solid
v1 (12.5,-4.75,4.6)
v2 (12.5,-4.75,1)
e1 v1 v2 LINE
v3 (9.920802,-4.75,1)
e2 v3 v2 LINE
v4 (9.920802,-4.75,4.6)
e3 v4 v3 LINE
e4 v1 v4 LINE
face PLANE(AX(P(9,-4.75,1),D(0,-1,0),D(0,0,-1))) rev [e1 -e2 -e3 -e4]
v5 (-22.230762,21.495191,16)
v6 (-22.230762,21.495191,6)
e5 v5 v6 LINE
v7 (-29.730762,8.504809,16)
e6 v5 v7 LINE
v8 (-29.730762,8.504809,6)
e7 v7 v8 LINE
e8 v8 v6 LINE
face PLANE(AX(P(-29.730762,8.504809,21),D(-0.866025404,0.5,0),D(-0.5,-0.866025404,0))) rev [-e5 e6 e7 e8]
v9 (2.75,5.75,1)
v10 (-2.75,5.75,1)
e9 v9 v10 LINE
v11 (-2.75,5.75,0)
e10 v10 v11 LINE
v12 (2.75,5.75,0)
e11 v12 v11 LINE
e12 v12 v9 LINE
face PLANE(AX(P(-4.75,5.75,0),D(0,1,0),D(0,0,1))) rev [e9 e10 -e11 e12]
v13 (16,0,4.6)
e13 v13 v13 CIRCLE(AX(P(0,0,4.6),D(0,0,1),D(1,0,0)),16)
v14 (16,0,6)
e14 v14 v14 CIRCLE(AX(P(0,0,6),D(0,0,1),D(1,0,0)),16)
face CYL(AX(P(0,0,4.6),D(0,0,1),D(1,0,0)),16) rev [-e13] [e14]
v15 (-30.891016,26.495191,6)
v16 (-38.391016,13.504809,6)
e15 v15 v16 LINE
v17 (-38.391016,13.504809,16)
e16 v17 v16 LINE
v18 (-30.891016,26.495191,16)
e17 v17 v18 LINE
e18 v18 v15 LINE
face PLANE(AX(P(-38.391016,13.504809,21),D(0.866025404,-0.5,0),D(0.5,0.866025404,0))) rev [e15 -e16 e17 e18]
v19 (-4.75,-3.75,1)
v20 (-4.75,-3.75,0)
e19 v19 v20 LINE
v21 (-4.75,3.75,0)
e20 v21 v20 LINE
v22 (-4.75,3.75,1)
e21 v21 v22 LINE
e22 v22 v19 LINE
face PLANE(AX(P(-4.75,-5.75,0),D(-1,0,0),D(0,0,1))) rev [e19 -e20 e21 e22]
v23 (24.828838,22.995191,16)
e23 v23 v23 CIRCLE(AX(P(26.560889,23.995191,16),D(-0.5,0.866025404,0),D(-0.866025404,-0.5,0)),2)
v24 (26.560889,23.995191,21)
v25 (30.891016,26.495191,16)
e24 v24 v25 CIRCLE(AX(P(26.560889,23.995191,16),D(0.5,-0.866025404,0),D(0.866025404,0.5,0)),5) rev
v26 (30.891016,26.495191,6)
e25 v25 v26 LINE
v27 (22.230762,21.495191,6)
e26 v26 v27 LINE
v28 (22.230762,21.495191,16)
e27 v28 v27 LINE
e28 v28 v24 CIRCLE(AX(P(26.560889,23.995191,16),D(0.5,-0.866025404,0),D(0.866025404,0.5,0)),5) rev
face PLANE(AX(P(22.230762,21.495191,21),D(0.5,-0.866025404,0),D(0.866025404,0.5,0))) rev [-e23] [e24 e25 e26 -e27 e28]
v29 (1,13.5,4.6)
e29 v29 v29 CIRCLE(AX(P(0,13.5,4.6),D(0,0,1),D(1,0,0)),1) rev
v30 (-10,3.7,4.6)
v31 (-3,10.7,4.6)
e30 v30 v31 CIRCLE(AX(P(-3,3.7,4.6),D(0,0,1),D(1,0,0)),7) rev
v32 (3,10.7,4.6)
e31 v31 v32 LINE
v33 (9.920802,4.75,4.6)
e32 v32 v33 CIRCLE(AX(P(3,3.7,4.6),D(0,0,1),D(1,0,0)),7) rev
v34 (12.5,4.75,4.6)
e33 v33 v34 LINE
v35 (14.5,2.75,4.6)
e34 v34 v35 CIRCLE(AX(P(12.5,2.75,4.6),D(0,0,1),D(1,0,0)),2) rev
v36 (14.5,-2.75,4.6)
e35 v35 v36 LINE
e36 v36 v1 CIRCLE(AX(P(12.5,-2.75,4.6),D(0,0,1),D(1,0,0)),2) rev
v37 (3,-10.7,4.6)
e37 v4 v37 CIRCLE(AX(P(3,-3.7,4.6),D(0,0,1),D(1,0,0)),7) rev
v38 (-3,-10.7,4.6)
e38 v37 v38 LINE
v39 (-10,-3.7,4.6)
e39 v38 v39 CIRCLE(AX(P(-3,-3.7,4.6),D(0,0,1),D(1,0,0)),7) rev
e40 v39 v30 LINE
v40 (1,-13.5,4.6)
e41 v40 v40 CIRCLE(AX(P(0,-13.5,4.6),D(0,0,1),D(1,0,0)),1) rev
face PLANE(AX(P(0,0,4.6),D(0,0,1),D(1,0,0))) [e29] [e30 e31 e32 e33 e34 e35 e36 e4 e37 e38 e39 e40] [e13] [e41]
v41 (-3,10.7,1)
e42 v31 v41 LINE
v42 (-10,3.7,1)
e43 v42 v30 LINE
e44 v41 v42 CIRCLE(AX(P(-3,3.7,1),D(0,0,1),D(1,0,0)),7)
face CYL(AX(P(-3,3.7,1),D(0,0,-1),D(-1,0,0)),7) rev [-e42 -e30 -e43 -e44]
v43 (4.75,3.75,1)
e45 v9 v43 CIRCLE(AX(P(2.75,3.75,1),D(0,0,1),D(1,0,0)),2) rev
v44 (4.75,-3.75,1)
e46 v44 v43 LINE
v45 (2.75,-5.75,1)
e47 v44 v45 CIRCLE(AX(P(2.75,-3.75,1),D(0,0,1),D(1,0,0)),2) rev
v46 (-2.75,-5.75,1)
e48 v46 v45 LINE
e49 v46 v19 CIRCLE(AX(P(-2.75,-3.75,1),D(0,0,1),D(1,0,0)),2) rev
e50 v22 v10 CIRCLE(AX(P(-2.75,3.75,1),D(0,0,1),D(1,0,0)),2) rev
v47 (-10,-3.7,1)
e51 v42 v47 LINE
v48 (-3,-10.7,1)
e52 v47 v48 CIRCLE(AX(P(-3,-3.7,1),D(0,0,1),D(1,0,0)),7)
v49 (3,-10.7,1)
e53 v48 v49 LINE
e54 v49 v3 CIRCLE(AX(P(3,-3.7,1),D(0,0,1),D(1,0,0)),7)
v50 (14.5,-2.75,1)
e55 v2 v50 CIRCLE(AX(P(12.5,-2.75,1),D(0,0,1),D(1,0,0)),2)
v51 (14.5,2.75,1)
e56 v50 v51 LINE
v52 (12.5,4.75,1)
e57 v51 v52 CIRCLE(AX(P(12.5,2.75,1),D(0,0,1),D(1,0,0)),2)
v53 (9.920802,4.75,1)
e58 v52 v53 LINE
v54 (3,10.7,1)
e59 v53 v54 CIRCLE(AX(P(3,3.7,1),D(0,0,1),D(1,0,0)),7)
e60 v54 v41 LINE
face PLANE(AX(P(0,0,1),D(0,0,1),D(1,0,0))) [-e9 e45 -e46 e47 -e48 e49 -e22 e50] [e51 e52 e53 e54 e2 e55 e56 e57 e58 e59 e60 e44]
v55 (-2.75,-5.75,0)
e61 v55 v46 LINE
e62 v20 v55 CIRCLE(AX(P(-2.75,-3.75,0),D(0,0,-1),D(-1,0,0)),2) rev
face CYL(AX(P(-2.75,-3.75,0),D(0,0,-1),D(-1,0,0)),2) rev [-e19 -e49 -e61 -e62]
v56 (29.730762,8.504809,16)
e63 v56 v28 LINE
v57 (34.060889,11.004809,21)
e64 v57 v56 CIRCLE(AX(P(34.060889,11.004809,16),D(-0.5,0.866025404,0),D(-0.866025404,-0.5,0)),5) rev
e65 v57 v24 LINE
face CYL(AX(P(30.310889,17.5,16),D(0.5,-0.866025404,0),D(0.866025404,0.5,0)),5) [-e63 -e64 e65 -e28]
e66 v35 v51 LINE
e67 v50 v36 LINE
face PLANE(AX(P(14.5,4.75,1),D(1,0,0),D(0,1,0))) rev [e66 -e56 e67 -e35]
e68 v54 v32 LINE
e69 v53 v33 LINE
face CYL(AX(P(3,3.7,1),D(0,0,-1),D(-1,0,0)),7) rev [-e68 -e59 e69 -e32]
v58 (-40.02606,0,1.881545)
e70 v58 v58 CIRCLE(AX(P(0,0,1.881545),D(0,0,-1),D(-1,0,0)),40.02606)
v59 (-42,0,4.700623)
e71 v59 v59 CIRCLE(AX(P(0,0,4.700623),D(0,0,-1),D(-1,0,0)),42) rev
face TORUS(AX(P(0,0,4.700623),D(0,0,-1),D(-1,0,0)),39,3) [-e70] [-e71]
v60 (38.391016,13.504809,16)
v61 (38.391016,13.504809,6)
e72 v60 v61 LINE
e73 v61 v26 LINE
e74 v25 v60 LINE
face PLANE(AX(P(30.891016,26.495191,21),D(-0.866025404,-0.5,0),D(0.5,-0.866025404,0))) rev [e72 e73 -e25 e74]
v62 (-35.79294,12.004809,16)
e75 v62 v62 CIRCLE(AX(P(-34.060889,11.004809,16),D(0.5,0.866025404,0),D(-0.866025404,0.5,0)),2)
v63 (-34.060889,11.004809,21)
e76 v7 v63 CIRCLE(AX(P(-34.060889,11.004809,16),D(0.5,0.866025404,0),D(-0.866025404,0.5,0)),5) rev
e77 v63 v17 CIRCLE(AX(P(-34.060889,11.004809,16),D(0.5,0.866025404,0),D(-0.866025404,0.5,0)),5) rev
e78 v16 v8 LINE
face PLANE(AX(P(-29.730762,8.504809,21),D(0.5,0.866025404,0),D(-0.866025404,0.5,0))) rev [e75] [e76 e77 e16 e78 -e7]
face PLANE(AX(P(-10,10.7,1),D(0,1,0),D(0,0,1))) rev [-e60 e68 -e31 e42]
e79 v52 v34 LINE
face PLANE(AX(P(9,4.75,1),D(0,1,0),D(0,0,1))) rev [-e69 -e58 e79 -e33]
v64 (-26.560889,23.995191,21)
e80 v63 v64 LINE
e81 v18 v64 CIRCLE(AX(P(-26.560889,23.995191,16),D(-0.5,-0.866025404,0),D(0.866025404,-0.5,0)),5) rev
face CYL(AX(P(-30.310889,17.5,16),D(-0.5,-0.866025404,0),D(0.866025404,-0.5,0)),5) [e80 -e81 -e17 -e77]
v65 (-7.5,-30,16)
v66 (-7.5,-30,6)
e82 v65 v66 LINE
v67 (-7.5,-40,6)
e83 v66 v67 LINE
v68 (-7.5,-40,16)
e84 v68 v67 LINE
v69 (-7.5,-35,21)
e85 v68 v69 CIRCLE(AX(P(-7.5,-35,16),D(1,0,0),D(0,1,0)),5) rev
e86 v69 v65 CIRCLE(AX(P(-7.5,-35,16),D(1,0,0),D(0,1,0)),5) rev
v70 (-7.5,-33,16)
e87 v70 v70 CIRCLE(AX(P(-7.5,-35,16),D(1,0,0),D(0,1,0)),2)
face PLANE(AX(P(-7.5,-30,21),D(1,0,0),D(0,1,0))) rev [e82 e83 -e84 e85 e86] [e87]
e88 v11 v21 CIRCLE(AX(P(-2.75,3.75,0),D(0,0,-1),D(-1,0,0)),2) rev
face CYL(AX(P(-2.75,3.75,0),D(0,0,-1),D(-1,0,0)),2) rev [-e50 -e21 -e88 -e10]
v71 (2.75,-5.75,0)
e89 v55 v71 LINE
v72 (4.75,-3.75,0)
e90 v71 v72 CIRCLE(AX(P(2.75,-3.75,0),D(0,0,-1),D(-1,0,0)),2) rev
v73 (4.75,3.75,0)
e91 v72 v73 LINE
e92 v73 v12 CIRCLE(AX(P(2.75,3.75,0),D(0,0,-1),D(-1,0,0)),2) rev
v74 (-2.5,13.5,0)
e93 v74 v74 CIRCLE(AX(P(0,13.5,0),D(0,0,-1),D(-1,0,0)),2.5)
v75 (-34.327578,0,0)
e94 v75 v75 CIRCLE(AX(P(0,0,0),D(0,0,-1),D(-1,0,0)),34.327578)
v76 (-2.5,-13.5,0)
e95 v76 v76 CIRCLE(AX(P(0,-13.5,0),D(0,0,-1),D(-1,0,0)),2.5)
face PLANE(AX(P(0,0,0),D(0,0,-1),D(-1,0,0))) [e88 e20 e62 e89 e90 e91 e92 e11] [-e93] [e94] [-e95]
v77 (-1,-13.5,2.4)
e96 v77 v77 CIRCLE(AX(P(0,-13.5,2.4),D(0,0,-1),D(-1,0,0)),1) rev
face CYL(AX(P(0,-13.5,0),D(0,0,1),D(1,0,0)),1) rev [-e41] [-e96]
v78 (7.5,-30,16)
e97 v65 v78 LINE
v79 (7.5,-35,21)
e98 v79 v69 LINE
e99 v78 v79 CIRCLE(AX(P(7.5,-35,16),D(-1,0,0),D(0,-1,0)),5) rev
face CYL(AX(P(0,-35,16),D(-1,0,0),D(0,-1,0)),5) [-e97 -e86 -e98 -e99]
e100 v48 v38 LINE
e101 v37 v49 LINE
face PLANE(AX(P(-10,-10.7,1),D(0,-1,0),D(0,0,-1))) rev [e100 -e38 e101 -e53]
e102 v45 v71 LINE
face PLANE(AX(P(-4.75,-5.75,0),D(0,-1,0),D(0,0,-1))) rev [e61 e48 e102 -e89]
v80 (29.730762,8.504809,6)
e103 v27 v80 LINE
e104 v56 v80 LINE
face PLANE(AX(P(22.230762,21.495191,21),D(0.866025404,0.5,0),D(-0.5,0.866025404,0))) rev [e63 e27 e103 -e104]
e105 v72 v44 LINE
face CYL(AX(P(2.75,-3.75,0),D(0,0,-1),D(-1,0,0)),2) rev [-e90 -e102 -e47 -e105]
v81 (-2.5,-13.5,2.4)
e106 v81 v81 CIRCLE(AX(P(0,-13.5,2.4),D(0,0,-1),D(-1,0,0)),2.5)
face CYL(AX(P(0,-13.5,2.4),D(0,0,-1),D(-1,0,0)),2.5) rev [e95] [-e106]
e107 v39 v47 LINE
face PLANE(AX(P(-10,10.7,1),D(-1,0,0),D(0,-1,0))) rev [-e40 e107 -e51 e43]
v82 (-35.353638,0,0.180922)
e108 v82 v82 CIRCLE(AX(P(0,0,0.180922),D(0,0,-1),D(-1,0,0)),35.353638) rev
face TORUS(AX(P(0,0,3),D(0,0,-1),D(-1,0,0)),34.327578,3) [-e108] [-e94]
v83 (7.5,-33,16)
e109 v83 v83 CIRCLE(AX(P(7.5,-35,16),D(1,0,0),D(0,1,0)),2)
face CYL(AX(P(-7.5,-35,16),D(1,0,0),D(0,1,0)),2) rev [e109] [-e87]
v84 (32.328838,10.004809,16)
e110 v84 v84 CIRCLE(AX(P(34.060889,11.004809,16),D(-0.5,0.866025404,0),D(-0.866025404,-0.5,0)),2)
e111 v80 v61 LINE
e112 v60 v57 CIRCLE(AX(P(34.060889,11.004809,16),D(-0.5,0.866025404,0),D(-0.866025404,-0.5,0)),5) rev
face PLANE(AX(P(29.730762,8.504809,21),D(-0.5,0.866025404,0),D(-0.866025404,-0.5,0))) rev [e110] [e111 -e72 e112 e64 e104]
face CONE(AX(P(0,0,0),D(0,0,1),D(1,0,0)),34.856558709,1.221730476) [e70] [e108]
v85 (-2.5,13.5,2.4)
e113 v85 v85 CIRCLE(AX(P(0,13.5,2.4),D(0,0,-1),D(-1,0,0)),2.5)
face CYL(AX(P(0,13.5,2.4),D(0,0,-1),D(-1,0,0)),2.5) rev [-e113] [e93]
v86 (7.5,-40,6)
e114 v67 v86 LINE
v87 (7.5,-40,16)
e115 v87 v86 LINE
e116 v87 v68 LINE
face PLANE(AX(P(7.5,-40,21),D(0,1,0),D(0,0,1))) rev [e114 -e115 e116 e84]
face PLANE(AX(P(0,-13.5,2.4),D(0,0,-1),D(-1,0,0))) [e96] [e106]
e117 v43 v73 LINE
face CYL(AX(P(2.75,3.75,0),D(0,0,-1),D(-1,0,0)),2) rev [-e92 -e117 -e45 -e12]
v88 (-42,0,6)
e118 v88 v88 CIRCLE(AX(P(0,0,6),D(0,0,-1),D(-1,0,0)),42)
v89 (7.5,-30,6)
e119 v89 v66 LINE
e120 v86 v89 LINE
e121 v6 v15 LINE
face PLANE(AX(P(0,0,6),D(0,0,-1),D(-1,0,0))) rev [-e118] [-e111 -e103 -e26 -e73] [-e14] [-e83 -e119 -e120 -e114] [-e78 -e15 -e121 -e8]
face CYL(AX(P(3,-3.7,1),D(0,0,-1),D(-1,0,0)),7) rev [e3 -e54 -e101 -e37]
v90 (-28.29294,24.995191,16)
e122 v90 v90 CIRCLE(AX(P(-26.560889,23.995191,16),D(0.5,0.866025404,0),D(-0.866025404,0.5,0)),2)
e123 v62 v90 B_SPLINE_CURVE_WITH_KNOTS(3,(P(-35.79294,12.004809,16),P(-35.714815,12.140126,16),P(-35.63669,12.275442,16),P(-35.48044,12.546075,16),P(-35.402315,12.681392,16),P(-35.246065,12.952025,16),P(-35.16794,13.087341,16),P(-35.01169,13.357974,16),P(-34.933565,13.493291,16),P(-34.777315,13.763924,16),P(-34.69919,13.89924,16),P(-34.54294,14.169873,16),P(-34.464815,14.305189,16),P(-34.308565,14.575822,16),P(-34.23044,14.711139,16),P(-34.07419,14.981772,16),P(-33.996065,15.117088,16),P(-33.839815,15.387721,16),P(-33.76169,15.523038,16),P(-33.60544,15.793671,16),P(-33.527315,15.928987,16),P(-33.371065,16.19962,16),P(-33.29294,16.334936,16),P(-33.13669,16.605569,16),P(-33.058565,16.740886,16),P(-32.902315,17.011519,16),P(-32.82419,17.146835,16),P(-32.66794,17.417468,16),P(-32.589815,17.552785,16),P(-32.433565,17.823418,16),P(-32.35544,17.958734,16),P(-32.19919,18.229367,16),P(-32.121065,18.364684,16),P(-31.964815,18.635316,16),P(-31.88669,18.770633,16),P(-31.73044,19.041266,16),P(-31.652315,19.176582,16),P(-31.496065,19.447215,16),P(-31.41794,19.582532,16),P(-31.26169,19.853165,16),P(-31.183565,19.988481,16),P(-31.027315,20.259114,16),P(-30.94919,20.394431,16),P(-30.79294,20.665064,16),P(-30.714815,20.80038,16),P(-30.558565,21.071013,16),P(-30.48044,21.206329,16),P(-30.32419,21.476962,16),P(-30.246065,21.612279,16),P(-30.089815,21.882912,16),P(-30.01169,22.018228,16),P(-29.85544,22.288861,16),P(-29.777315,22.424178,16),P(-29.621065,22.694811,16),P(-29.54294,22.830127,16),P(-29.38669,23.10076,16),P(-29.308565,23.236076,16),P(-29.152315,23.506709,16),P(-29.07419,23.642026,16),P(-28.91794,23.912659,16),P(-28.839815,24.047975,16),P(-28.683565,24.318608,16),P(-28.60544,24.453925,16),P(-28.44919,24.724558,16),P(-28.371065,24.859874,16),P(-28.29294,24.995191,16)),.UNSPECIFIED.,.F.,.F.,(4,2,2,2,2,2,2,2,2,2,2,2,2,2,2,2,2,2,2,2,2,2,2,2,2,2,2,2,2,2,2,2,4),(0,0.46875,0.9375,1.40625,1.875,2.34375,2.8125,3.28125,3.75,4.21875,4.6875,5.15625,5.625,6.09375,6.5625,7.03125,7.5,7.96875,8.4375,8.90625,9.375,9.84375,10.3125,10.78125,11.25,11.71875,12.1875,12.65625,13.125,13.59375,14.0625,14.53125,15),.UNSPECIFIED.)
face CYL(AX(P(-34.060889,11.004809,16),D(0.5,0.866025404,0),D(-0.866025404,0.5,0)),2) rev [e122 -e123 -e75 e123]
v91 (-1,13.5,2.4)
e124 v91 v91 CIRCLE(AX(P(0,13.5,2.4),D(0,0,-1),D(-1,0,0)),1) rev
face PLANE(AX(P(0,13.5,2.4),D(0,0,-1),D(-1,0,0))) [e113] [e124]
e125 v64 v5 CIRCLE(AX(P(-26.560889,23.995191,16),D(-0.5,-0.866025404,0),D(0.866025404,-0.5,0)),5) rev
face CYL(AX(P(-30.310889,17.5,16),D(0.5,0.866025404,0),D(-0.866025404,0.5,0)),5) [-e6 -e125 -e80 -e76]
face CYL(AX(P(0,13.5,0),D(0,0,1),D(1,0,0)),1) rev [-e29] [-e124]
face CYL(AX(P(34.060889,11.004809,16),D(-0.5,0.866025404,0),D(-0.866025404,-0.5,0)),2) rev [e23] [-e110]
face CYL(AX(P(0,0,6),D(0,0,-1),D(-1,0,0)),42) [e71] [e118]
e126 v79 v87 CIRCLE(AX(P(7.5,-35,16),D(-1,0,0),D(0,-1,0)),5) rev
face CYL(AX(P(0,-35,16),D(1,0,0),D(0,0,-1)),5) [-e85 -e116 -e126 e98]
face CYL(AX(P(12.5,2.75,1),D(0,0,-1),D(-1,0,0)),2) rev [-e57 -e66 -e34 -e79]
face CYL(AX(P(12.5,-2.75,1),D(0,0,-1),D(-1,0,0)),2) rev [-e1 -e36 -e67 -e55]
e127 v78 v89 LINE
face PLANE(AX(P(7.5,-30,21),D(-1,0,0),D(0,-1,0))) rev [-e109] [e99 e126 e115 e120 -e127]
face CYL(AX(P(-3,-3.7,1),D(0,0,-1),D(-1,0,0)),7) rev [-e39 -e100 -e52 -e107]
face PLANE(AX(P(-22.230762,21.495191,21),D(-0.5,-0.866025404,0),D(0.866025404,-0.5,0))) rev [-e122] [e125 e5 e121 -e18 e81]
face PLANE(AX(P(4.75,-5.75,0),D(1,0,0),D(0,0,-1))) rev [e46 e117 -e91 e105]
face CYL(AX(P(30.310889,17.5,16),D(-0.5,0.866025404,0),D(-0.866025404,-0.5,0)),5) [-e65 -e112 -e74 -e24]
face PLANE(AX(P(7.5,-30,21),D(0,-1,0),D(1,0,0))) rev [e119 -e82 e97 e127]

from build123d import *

# Parameters (mm, degrees)
BOSS_EXTRUDE1_DEPTH = 6
SKETCH3_R           = 3
CUT_EXTRUDE1_DEPTH  = 43.330607543
SKETCH8_W           = 20
SKETCH8_H           = 21.4
CUT_EXTRUDE5_DEPTH  = 5
FILLET8_R           = 7
SKETCH9_R           = 1
CUT_EXTRUDE6_DEPTH  = 43.330607543
SKETCH10_W          = 9.5
SKETCH10_H          = 11.5
CUT_EXTRUDE7_DEPTH  = 43.200477899
FILLET9_R           = 2
SKETCH11_W          = 5.5
SKETCH11_H          = 9.5
CUT_EXTRUDE8_DEPTH  = 5
FILLET10_R          = 2
SKETCH12_R          = 16
CUT_EXTRUDE9_DEPTH  = 1.4
SKETCH13_R          = 2.5
CUT_EXTRUDE10_DEPTH = 2.4
SKETCH14_R          = 42
BOSS_EXTRUDE3_DEPTH = 6
CHAMFER1_SIZE       = 2.6
CHAMFER1_SIZE2      = 7.143441291
FILLET12_R          = 3
SKETCH15_W          = 15
SKETCH15_H          = 10
BOSS_EXTRUDE4_DEPTH = 15
SKETCH16_R          = 2
CUT_EXTRUDE11_DEPTH = 15
SKETCH17_R          = 2
CUT_EXTRUDE12_DEPTH = 15
SKETCH18_R          = 2
CUT_EXTRUDE13_DEPTH = 15
FILLET13_R          = 5


with BuildPart() as part:
    # Sketch1 → Boss-Extrude1 (new body)
    with BuildSketch(Plane.XY):
        Polygon((-11.547005384, 20), (-5.63450733, 30.24074703), (5.63450733, 30.24074703), (5.773502692, 30), (23.094010768, 0), (29.006508822, -10.24074703), (23.372001492, -20), (23.094010768, -20), (-11.547005384, -20), (-23.372001492, -20), (-29.006508822, -10.24074703), (-28.867513459, -10), align=None)
    extrude(amount=BOSS_EXTRUDE1_DEPTH)

    # Sketch3 → Cut-Extrude1 (cut, through all)
    with BuildSketch(Plane.XY.offset(6)):
        Circle(SKETCH3_R)
    extrude(amount=-CUT_EXTRUDE1_DEPTH, mode=Mode.SUBTRACT)

    # Sketch8 → Cut-Extrude5 (cut)
    with BuildSketch(Plane.XY.offset(6)):
        Rectangle(SKETCH8_W, SKETCH8_H)
    extrude(amount=-CUT_EXTRUDE5_DEPTH, mode=Mode.SUBTRACT)

    # Fillet8
    fillet8_edges = [part.edges().sort_by_distance(p)[0] for p in [
        (10, 10.7, 3.5),
        (10, -10.7, 3.5),
        (-10, -10.7, 3.5),
        (-10, 10.7, 3.5),
    ]]
    fillet(fillet8_edges, radius=FILLET8_R)

    # Sketch9 → Cut-Extrude6 (cut, through all)
    with BuildSketch(Plane.XY.offset(6)):
        with Locations((0, 13.5)):
            Circle(SKETCH9_R)
        with Locations(Location((0, -13.5, 0), (0, 0, 180))):
            Circle(SKETCH9_R)
    extrude(amount=-CUT_EXTRUDE6_DEPTH, mode=Mode.SUBTRACT)

    # Sketch10 → Cut-Extrude7 (cut, through all)
    with BuildSketch(Plane.XY.offset(1)):
        Rectangle(SKETCH10_W, SKETCH10_H)
    extrude(amount=-CUT_EXTRUDE7_DEPTH, mode=Mode.SUBTRACT)

    # Fillet9
    fillet9_edges = [part.edges().sort_by_distance(p)[0] for p in [
        (4.75, 5.75, 0.5),
        (4.75, -5.75, 0.5),
        (-4.75, -5.75, 0.5),
        (-4.75, 5.75, 0.5),
    ]]
    fillet(fillet9_edges, radius=FILLET9_R)

    # Sketch11 → Cut-Extrude8 (cut)
    with BuildSketch(Plane.XY.offset(6)):
        with Locations((11.75, 0)):
            Rectangle(SKETCH11_W, SKETCH11_H)
    extrude(amount=-CUT_EXTRUDE8_DEPTH, mode=Mode.SUBTRACT)

    # Fillet10
    fillet10_edges = [part.edges().sort_by_distance(p)[0] for p in [
        (14.5, -4.75, 3.5),
        (14.5, 4.75, 3.5),
    ]]
    fillet(fillet10_edges, radius=FILLET10_R)

    # Sketch12 → Cut-Extrude9 (cut)
    with BuildSketch(Plane.XY.offset(6)):
        Circle(SKETCH12_R)
    extrude(amount=-CUT_EXTRUDE9_DEPTH, mode=Mode.SUBTRACT)

    # Sketch13 → Cut-Extrude10 (cut)
    with BuildSketch(Plane(origin=(0, 0, 0), x_dir=(-1, 0, 0), z_dir=(0, 0, -1))):
        with Locations((0, 13.5)):
            Circle(SKETCH13_R)
        with Locations((0, -13.5)):
            Circle(SKETCH13_R)
    extrude(amount=-CUT_EXTRUDE10_DEPTH, mode=Mode.SUBTRACT)

    # Sketch14 → Boss-Extrude3 (add)
    with BuildSketch(Plane(origin=(0, 0, 0), x_dir=(-1, 0, 0), z_dir=(0, 0, -1))):
        Circle(SKETCH14_R)
        Polygon((19.538701505, 0), (9.769350753, 16.921011861), (-9.769350753, 16.921011861), (-19.538701505, 0), (-9.769350753, -16.921011861), (9.769350753, -16.921011861), align=None, mode=Mode.SUBTRACT)
    extrude(amount=-BOSS_EXTRUDE3_DEPTH)

    # Chamfer1
    chamfer1_edges = [part.edges().sort_by_distance(p)[0] for p in [
        (42, 0, 0),
    ]]
    chamfer1_side = [part.faces().sort_by_distance(p)[0] for p in [
        (42, 0, 3),
    ]]
    chamfer(chamfer1_edges, length=CHAMFER1_SIZE, length2=CHAMFER1_SIZE2, reference=chamfer1_side[0])

    # Fillet12
    fillet12_edges = [part.edges().sort_by_distance(p)[0] for p in [
        (34.856558709, 0, 0),
        (42, 0, 2.6),
    ]]
    fillet(fillet12_edges, radius=FILLET12_R)

    # Sketch15 → Boss-Extrude4 (add)
    with BuildSketch(Plane.XY.offset(6)):
        Polygon((-29.730762114, 8.504809472), (-22.230762114, 21.495190528), (-30.891016151, 26.495190528), (-38.391016151, 13.504809472), align=None)
        with Locations((0, -35)):
            Rectangle(SKETCH15_W, SKETCH15_H)
        Polygon((22.230762114, 21.495190528), (29.730762114, 8.504809472), (38.391016151, 13.504809472), (30.891016151, 26.495190528), align=None)
    extrude(amount=BOSS_EXTRUDE4_DEPTH)

    # Sketch16 → Cut-Extrude11 (cut)
    with BuildSketch(Plane(origin=(-3.75, 6.495190528, 0), x_dir=(0.8660254037844431, 0.49999999999999234, 0), z_dir=(-0.4999999999999924, 0.8660254037844431, 0))):
        with Locations(Location((35, -16, 0), (0, 0, 180))):
            Circle(SKETCH16_R)
    extrude(amount=-CUT_EXTRUDE11_DEPTH, mode=Mode.SUBTRACT)

    # Sketch17 → Cut-Extrude12 (cut)
    with BuildSketch(Plane(origin=(7.5, 0, 0), x_dir=(0, 0, -1), z_dir=(1, 0, 0))):
        with Locations(Location((-16, -35, 0), (0, 0, 90))):
            Circle(SKETCH17_R)
    extrude(amount=-CUT_EXTRUDE12_DEPTH, mode=Mode.SUBTRACT)

    # Sketch18 → Cut-Extrude13 (cut)
    with BuildSketch(Plane(origin=(3.75, 6.495190528, 0), x_dir=(0.8660254037844364, -0.5000000000000041, 0), z_dir=(0.500000000000004, 0.8660254037844363, 0))):
        with Locations(Location((-35, -16, 0), (0, 0, 180))):
            Circle(SKETCH18_R)
    extrude(amount=-CUT_EXTRUDE13_DEPTH, mode=Mode.SUBTRACT)

    # Fillet13
    fillet13_edges = [part.edges().sort_by_distance(p)[0] for p in [
        (0, -40, 21),
        (0, -30, 21),
        (-34.641016151, 20, 21),
        (-25.980762114, 15, 21),
        (25.980762114, 15, 21),
        (34.641016151, 20, 21),
    ]]
    fillet(fillet13_edges, radius=FILLET13_R - 0.0001)  # a hair under: the kernel refuses the full size


solid = part.part
